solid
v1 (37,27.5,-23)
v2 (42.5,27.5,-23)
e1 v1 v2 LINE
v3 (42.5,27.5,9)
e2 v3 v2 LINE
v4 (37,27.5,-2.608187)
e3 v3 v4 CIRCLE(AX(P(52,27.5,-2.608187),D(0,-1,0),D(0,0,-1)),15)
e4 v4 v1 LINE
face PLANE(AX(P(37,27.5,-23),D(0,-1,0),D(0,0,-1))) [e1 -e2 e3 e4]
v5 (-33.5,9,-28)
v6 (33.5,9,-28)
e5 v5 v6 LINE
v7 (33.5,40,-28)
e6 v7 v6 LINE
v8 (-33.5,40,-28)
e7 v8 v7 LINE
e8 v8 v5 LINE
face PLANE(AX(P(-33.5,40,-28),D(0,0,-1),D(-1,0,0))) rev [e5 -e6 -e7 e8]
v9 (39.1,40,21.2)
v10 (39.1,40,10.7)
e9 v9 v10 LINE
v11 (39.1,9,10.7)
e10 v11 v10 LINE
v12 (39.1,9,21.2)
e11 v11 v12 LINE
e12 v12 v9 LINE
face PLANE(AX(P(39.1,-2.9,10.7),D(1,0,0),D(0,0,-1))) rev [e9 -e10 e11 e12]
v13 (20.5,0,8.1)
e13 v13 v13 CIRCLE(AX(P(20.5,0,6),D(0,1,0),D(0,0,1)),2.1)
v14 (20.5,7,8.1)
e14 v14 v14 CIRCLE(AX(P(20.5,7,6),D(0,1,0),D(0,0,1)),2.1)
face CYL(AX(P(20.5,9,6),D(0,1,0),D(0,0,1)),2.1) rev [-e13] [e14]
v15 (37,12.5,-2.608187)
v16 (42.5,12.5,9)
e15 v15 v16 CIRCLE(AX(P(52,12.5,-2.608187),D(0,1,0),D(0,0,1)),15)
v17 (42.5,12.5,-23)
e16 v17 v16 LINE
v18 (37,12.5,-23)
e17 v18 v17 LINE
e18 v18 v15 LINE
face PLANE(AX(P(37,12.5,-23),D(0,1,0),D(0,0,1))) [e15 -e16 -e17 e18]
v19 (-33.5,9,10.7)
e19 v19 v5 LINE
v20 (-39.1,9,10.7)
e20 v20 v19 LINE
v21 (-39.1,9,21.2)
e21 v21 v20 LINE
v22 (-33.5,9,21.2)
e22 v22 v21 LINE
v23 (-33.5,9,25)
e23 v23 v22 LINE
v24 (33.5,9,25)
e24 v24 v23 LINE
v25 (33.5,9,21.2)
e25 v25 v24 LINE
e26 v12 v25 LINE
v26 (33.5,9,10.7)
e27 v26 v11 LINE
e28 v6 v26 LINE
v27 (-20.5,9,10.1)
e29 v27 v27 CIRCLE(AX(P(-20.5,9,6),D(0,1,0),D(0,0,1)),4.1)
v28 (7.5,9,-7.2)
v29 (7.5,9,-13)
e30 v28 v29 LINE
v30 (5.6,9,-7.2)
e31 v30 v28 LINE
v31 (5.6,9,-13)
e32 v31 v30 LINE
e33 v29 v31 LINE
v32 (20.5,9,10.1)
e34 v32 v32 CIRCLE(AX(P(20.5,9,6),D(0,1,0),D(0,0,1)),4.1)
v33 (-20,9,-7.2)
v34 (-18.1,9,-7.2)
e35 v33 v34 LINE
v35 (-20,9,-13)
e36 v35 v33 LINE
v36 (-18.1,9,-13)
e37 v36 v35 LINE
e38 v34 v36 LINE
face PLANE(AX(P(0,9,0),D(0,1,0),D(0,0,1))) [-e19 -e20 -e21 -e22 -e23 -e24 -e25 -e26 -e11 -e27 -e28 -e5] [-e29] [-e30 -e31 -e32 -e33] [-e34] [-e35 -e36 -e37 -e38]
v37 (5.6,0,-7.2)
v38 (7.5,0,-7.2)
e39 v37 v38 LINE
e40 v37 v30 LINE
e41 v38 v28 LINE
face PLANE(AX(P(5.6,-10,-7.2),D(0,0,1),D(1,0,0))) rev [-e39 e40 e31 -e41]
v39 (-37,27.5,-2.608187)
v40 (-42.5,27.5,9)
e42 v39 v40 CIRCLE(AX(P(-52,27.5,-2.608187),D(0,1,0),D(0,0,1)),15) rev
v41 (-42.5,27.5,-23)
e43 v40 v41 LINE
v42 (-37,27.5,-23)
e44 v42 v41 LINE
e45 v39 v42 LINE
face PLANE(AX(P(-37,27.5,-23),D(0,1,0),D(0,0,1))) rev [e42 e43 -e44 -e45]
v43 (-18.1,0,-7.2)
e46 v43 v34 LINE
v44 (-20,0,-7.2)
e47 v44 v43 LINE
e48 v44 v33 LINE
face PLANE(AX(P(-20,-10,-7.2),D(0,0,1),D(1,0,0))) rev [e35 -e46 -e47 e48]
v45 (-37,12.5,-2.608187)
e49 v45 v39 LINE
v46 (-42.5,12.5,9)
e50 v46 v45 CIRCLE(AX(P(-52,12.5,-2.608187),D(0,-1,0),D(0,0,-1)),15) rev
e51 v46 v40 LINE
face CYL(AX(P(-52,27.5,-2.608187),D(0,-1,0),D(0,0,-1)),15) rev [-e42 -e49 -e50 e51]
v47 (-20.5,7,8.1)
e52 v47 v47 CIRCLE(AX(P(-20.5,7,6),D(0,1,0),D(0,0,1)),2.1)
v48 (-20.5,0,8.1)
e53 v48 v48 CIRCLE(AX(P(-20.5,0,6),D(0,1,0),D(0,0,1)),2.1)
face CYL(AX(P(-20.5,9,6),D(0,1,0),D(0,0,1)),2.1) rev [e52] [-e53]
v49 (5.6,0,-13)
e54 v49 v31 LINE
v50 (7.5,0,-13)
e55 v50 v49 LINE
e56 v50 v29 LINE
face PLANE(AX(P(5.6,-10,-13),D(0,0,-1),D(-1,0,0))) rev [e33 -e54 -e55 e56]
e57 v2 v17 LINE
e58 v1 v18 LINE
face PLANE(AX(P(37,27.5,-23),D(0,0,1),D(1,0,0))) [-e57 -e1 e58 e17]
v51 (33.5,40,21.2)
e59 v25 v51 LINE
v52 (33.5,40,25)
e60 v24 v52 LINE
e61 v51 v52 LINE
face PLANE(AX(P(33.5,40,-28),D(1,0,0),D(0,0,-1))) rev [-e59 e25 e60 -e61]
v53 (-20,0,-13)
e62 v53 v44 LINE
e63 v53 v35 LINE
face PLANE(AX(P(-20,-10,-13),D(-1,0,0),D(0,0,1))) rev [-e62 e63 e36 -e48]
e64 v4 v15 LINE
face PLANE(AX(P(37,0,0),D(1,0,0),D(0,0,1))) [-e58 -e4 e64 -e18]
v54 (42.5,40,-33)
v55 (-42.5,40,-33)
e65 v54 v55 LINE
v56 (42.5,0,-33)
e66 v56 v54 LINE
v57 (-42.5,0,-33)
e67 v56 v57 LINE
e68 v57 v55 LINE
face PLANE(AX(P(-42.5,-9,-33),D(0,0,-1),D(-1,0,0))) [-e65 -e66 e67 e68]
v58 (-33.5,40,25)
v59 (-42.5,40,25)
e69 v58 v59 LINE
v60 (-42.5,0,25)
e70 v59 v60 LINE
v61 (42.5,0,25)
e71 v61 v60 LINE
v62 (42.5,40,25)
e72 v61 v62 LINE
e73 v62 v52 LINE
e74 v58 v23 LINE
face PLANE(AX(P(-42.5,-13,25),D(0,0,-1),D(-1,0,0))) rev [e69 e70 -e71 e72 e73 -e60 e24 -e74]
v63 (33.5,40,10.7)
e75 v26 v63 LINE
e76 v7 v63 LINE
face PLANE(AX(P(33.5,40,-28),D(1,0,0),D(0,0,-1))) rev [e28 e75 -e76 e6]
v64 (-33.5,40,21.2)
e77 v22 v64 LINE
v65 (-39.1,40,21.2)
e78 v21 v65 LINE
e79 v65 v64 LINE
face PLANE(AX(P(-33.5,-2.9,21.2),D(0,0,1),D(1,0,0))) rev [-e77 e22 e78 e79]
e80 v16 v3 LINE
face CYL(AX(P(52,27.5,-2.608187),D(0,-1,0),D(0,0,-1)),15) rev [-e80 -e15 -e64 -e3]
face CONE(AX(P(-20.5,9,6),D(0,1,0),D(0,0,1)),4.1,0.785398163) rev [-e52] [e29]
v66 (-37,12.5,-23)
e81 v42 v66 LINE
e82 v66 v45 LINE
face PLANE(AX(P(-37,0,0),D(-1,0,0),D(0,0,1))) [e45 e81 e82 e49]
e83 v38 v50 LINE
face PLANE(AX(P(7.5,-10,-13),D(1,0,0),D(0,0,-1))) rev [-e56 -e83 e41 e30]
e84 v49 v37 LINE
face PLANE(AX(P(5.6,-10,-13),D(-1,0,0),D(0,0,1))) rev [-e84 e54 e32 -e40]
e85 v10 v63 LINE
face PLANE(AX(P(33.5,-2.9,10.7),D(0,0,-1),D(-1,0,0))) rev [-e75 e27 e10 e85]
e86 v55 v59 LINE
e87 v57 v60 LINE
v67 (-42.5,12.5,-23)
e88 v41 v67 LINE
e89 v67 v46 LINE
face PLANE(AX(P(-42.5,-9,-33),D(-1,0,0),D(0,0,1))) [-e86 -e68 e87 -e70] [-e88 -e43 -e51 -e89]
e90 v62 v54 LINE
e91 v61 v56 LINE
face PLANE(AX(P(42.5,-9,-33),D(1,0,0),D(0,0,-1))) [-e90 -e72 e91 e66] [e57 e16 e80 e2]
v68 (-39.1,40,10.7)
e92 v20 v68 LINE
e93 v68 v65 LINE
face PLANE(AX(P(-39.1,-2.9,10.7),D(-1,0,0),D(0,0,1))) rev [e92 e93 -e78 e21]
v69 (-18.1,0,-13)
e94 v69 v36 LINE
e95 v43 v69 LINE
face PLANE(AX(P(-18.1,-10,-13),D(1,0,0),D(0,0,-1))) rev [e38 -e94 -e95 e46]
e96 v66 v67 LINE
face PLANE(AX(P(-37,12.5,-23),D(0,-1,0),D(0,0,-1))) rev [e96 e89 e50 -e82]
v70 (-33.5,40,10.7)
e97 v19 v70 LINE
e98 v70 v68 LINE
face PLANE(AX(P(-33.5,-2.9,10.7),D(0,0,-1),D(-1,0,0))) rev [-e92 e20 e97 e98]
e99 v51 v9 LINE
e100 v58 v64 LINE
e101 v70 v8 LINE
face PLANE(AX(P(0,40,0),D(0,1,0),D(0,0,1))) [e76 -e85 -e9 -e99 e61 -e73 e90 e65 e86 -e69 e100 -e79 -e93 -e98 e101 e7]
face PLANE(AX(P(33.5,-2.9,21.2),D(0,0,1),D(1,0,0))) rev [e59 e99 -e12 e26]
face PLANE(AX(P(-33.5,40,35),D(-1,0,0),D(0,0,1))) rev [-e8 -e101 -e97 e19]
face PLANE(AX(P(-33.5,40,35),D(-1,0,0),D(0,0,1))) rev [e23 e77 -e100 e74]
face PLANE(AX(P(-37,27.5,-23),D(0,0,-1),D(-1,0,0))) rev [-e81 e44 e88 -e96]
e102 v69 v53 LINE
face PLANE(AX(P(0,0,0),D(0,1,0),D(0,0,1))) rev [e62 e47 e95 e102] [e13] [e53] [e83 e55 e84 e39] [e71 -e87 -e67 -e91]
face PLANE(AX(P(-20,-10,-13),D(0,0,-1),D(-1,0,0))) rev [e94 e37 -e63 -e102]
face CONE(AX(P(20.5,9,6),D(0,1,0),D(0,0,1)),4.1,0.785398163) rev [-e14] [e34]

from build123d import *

# Parameters (mm, degrees)
SKETCH1_W                                         = 91
SKETCH1_H                                         = 70
BOSS_EXTRUDE1_DEPTH                               = 9
BOSS_EXTRUDE2_DEPTH                               = 31
SKETCH3_W                                         = 5.6
SKETCH3_H                                         = 10.5
CUT_EXTRUDE1_DEPTH                                = 31
SKETCH4_W                                         = 4.7
SKETCH4_H                                         = 4.9
BOSS_EXTRUDE3_DEPTH                               = 18.5
FILLET1_R                                         = 2
SKETCH5_W                                         = 1.9
SKETCH5_H                                         = 5.8
CUT_EXTRUDE2_DEPTH                                = 19
CSK_FOR_M3_5_FLAT_HEAD_MACHINE_SCREW1_D           = 4.2
CSK_FOR_M3_5_FLAT_HEAD_MACHINE_SCREW1_CSINK_D     = 8.2
CSK_FOR_M3_5_FLAT_HEAD_MACHINE_SCREW1_CSINK_ANGLE = 90
SKETCH11_W                                        = 101.27142764
SKETCH11_H                                        = 82.667879483
SKETCH11_W_2                                      = 85
SKETCH11_H_2                                      = 73.983129472
CUT_EXTRUDE4_DEPTH                                = 49
SKETCH12_W                                        = 32
SKETCH12_H                                        = 15
CUT_EXTRUDE5_DEPTH                                = 5.5
FILLET3_R                                         = 15
FILLET3_OF_MIRROR1_R                              = 15
SKETCH13_W                                        = 85
SKETCH13_H                                        = 10
CUT_EXTRUDE6_DEPTH                                = 53
SKETCH14_W                                        = 23
SKETCH14_H                                        = 31
CUT_EXTRUDE7_DEPTH                                = 10


with BuildPart() as part:
    # Sketch1 → Boss-Extrude1 (new body)
    with BuildSketch(Plane(origin=(0, 0, 0), x_dir=(1, 0, 0), z_dir=(0, 1, 0))):
        Rectangle(SKETCH1_W, SKETCH1_H)
    extrude(amount=BOSS_EXTRUDE1_DEPTH)

    # Sketch2 → Boss-Extrude2 (add)
    with BuildSketch(Plane(origin=(0, 9, 0), x_dir=(1, 0, 0), z_dir=(0, 1, 0))):
        Polygon((-33.5, -35), (-33.5, 28), (33.5, 28), (33.5, -35), (45.5, -35), (45.5, 35), (-45.5, 35), (-45.5, -35), align=None)
    extrude(amount=BOSS_EXTRUDE2_DEPTH)

    # Sketch3 → Cut-Extrude1 (cut)
    with BuildSketch(Plane(origin=(0, 40, 0), x_dir=(1, 0, 0), z_dir=(0, 1, 0))):
        with Locations((-36.3, -15.95)):
            Rectangle(SKETCH3_W, SKETCH3_H)
        with Locations((36.3, -15.95)):
            Rectangle(SKETCH3_W, SKETCH3_H)
    extrude(amount=-CUT_EXTRUDE1_DEPTH, mode=Mode.SUBTRACT)

    # Sketch4 → Boss-Extrude3 (add)
    with BuildSketch(Plane(origin=(0, 9, 0), x_dir=(1, 0, 0), z_dir=(0, 1, 0))):
        with Locations((-7.15, 25.55)):
            Rectangle(SKETCH4_W, SKETCH4_H)
        with Locations((7.15, 25.55)):
            Rectangle(SKETCH4_W, SKETCH4_H)
    extrude(amount=BOSS_EXTRUDE3_DEPTH)

    # Fillet1
    fillet1_edges = [part.edges().sort_by_distance(p)[0] for p in [
        (-9.5, 27.5, -25.55),
        (-4.8, 27.5, -25.55),
        (4.8, 27.5, -25.55),
        (9.5, 27.5, -25.55),
    ]]
    fillet(fillet1_edges, radius=FILLET1_R)

    # Sketch5 → Cut-Extrude2 (cut)
    with BuildSketch(Plane(origin=(0, 9, 0), x_dir=(1, 0, 0), z_dir=(0, 1, 0))):
        with Locations((-19.05, 10.1)):
            Rectangle(SKETCH5_W, SKETCH5_H)
        with Locations((6.55, 10.1)):
            Rectangle(SKETCH5_W, SKETCH5_H)
    extrude(amount=-CUT_EXTRUDE2_DEPTH, mode=Mode.SUBTRACT)

    # CSK for M3.5 Flat Head Machine Screw1 (through all)
    with Locations(Plane(origin=(-20.5, 9, 6), x_dir=(0, 0, 1), z_dir=(0, 1, 0))):
        with Locations((0, 0), (0, 41)):
            CounterSinkHole(CSK_FOR_M3_5_FLAT_HEAD_MACHINE_SCREW1_D / 2, CSK_FOR_M3_5_FLAT_HEAD_MACHINE_SCREW1_CSINK_D / 2, counter_sink_angle=CSK_FOR_M3_5_FLAT_HEAD_MACHINE_SCREW1_CSINK_ANGLE)

    # Sketch11 → Cut-Extrude4 (cut)
    with BuildSketch(Plane(origin=(0, 40, 0), x_dir=(1, 0, 0), z_dir=(0, 1, 0))):
        with Locations((-0.171320914, -3.126256715)):
            Rectangle(SKETCH11_W, SKETCH11_H)
        with Locations((0, -3.991564736)):
            Rectangle(SKETCH11_W_2, SKETCH11_H_2, mode=Mode.SUBTRACT)
    extrude(amount=-CUT_EXTRUDE4_DEPTH, mode=Mode.SUBTRACT)

    # Sketch12 → Cut-Extrude5 (cut)
    with BuildSketch(Plane.ZY.offset(42.5)):
        with Locations((-7, 20)):
            Rectangle(SKETCH12_W, SKETCH12_H)
    cut_extrude5 = extrude(amount=-CUT_EXTRUDE5_DEPTH, mode=Mode.SUBTRACT)

    # Fillet3
    # the kernel refuses this fillet: 15 mm, written as the material it adds along each edge
    with BuildSketch(Plane(origin=(-37, 27.5, 9), x_dir=(-1, 0, 0), z_dir=(0, -1, 0))) as fillet3_piece_1:
        with BuildLine():
            CenterArc((15, 11.608186766), FILLET3_R, 180, 50.703519761)
            Line((0, 11.608186766), (-0.3, 11.608186766))
            Line((-0.3, 11.608186766), (-0.3, 0))
            Line((-0.3, 0), (0, -0.3))
            ThreePointArc((0, -0.3), (2.75, -0.3), (5.31, -0.232163735))
            Line((5.31, -0.232163735), (5.5, 0))
        make_face()
    extrude(amount=15)

    # Mirror1: Cut-Extrude5 across plane
    add(cut_extrude5.mirror(Plane(origin=(0, 0, 0), x_dir=(0, 0, 1), z_dir=(1, 0, 0))), mode=Mode.SUBTRACT)

    # Fillet3 of Mirror1
    # the kernel refuses this fillet: 15 mm, written as the material it adds along each edge
    with BuildSketch(Plane(origin=(37, 27.5, 9), x_dir=(1, 0, 0), z_dir=(0, -1, 0))) as fillet3_of_mirror1_piece_1:
        with BuildLine():
            CenterArc((15, -11.608186766), FILLET3_OF_MIRROR1_R, 129.296480239, 50.703519761)
            Line((0, -11.608186766), (-0.3, -11.608186766))
            Line((-0.3, -11.608186766), (-0.3, 0))
            Line((-0.3, 0), (0, 0.3))
            ThreePointArc((0, 0.3), (2.75, 0.3), (5.31, 0.232163735))
            Line((5.31, 0.232163735), (5.5, 0))
        make_face()
    extrude(amount=15)

    # Sketch13 → Cut-Extrude6 (cut)
    with BuildSketch(Plane(origin=(0, 40, 0), x_dir=(1, 0, 0), z_dir=(0, 1, 0))):
        with Locations((0, -30)):
            Rectangle(SKETCH13_W, SKETCH13_H)
    extrude(amount=-CUT_EXTRUDE6_DEPTH, mode=Mode.SUBTRACT)

    # Sketch14 → Cut-Extrude7 (cut)
    with BuildSketch(Plane.XY.offset(-28)):
        with Locations((-1.5, 24.5)):
            Rectangle(SKETCH14_W, SKETCH14_H)
    extrude(amount=CUT_EXTRUDE7_DEPTH, mode=Mode.SUBTRACT)


solid = part.part
